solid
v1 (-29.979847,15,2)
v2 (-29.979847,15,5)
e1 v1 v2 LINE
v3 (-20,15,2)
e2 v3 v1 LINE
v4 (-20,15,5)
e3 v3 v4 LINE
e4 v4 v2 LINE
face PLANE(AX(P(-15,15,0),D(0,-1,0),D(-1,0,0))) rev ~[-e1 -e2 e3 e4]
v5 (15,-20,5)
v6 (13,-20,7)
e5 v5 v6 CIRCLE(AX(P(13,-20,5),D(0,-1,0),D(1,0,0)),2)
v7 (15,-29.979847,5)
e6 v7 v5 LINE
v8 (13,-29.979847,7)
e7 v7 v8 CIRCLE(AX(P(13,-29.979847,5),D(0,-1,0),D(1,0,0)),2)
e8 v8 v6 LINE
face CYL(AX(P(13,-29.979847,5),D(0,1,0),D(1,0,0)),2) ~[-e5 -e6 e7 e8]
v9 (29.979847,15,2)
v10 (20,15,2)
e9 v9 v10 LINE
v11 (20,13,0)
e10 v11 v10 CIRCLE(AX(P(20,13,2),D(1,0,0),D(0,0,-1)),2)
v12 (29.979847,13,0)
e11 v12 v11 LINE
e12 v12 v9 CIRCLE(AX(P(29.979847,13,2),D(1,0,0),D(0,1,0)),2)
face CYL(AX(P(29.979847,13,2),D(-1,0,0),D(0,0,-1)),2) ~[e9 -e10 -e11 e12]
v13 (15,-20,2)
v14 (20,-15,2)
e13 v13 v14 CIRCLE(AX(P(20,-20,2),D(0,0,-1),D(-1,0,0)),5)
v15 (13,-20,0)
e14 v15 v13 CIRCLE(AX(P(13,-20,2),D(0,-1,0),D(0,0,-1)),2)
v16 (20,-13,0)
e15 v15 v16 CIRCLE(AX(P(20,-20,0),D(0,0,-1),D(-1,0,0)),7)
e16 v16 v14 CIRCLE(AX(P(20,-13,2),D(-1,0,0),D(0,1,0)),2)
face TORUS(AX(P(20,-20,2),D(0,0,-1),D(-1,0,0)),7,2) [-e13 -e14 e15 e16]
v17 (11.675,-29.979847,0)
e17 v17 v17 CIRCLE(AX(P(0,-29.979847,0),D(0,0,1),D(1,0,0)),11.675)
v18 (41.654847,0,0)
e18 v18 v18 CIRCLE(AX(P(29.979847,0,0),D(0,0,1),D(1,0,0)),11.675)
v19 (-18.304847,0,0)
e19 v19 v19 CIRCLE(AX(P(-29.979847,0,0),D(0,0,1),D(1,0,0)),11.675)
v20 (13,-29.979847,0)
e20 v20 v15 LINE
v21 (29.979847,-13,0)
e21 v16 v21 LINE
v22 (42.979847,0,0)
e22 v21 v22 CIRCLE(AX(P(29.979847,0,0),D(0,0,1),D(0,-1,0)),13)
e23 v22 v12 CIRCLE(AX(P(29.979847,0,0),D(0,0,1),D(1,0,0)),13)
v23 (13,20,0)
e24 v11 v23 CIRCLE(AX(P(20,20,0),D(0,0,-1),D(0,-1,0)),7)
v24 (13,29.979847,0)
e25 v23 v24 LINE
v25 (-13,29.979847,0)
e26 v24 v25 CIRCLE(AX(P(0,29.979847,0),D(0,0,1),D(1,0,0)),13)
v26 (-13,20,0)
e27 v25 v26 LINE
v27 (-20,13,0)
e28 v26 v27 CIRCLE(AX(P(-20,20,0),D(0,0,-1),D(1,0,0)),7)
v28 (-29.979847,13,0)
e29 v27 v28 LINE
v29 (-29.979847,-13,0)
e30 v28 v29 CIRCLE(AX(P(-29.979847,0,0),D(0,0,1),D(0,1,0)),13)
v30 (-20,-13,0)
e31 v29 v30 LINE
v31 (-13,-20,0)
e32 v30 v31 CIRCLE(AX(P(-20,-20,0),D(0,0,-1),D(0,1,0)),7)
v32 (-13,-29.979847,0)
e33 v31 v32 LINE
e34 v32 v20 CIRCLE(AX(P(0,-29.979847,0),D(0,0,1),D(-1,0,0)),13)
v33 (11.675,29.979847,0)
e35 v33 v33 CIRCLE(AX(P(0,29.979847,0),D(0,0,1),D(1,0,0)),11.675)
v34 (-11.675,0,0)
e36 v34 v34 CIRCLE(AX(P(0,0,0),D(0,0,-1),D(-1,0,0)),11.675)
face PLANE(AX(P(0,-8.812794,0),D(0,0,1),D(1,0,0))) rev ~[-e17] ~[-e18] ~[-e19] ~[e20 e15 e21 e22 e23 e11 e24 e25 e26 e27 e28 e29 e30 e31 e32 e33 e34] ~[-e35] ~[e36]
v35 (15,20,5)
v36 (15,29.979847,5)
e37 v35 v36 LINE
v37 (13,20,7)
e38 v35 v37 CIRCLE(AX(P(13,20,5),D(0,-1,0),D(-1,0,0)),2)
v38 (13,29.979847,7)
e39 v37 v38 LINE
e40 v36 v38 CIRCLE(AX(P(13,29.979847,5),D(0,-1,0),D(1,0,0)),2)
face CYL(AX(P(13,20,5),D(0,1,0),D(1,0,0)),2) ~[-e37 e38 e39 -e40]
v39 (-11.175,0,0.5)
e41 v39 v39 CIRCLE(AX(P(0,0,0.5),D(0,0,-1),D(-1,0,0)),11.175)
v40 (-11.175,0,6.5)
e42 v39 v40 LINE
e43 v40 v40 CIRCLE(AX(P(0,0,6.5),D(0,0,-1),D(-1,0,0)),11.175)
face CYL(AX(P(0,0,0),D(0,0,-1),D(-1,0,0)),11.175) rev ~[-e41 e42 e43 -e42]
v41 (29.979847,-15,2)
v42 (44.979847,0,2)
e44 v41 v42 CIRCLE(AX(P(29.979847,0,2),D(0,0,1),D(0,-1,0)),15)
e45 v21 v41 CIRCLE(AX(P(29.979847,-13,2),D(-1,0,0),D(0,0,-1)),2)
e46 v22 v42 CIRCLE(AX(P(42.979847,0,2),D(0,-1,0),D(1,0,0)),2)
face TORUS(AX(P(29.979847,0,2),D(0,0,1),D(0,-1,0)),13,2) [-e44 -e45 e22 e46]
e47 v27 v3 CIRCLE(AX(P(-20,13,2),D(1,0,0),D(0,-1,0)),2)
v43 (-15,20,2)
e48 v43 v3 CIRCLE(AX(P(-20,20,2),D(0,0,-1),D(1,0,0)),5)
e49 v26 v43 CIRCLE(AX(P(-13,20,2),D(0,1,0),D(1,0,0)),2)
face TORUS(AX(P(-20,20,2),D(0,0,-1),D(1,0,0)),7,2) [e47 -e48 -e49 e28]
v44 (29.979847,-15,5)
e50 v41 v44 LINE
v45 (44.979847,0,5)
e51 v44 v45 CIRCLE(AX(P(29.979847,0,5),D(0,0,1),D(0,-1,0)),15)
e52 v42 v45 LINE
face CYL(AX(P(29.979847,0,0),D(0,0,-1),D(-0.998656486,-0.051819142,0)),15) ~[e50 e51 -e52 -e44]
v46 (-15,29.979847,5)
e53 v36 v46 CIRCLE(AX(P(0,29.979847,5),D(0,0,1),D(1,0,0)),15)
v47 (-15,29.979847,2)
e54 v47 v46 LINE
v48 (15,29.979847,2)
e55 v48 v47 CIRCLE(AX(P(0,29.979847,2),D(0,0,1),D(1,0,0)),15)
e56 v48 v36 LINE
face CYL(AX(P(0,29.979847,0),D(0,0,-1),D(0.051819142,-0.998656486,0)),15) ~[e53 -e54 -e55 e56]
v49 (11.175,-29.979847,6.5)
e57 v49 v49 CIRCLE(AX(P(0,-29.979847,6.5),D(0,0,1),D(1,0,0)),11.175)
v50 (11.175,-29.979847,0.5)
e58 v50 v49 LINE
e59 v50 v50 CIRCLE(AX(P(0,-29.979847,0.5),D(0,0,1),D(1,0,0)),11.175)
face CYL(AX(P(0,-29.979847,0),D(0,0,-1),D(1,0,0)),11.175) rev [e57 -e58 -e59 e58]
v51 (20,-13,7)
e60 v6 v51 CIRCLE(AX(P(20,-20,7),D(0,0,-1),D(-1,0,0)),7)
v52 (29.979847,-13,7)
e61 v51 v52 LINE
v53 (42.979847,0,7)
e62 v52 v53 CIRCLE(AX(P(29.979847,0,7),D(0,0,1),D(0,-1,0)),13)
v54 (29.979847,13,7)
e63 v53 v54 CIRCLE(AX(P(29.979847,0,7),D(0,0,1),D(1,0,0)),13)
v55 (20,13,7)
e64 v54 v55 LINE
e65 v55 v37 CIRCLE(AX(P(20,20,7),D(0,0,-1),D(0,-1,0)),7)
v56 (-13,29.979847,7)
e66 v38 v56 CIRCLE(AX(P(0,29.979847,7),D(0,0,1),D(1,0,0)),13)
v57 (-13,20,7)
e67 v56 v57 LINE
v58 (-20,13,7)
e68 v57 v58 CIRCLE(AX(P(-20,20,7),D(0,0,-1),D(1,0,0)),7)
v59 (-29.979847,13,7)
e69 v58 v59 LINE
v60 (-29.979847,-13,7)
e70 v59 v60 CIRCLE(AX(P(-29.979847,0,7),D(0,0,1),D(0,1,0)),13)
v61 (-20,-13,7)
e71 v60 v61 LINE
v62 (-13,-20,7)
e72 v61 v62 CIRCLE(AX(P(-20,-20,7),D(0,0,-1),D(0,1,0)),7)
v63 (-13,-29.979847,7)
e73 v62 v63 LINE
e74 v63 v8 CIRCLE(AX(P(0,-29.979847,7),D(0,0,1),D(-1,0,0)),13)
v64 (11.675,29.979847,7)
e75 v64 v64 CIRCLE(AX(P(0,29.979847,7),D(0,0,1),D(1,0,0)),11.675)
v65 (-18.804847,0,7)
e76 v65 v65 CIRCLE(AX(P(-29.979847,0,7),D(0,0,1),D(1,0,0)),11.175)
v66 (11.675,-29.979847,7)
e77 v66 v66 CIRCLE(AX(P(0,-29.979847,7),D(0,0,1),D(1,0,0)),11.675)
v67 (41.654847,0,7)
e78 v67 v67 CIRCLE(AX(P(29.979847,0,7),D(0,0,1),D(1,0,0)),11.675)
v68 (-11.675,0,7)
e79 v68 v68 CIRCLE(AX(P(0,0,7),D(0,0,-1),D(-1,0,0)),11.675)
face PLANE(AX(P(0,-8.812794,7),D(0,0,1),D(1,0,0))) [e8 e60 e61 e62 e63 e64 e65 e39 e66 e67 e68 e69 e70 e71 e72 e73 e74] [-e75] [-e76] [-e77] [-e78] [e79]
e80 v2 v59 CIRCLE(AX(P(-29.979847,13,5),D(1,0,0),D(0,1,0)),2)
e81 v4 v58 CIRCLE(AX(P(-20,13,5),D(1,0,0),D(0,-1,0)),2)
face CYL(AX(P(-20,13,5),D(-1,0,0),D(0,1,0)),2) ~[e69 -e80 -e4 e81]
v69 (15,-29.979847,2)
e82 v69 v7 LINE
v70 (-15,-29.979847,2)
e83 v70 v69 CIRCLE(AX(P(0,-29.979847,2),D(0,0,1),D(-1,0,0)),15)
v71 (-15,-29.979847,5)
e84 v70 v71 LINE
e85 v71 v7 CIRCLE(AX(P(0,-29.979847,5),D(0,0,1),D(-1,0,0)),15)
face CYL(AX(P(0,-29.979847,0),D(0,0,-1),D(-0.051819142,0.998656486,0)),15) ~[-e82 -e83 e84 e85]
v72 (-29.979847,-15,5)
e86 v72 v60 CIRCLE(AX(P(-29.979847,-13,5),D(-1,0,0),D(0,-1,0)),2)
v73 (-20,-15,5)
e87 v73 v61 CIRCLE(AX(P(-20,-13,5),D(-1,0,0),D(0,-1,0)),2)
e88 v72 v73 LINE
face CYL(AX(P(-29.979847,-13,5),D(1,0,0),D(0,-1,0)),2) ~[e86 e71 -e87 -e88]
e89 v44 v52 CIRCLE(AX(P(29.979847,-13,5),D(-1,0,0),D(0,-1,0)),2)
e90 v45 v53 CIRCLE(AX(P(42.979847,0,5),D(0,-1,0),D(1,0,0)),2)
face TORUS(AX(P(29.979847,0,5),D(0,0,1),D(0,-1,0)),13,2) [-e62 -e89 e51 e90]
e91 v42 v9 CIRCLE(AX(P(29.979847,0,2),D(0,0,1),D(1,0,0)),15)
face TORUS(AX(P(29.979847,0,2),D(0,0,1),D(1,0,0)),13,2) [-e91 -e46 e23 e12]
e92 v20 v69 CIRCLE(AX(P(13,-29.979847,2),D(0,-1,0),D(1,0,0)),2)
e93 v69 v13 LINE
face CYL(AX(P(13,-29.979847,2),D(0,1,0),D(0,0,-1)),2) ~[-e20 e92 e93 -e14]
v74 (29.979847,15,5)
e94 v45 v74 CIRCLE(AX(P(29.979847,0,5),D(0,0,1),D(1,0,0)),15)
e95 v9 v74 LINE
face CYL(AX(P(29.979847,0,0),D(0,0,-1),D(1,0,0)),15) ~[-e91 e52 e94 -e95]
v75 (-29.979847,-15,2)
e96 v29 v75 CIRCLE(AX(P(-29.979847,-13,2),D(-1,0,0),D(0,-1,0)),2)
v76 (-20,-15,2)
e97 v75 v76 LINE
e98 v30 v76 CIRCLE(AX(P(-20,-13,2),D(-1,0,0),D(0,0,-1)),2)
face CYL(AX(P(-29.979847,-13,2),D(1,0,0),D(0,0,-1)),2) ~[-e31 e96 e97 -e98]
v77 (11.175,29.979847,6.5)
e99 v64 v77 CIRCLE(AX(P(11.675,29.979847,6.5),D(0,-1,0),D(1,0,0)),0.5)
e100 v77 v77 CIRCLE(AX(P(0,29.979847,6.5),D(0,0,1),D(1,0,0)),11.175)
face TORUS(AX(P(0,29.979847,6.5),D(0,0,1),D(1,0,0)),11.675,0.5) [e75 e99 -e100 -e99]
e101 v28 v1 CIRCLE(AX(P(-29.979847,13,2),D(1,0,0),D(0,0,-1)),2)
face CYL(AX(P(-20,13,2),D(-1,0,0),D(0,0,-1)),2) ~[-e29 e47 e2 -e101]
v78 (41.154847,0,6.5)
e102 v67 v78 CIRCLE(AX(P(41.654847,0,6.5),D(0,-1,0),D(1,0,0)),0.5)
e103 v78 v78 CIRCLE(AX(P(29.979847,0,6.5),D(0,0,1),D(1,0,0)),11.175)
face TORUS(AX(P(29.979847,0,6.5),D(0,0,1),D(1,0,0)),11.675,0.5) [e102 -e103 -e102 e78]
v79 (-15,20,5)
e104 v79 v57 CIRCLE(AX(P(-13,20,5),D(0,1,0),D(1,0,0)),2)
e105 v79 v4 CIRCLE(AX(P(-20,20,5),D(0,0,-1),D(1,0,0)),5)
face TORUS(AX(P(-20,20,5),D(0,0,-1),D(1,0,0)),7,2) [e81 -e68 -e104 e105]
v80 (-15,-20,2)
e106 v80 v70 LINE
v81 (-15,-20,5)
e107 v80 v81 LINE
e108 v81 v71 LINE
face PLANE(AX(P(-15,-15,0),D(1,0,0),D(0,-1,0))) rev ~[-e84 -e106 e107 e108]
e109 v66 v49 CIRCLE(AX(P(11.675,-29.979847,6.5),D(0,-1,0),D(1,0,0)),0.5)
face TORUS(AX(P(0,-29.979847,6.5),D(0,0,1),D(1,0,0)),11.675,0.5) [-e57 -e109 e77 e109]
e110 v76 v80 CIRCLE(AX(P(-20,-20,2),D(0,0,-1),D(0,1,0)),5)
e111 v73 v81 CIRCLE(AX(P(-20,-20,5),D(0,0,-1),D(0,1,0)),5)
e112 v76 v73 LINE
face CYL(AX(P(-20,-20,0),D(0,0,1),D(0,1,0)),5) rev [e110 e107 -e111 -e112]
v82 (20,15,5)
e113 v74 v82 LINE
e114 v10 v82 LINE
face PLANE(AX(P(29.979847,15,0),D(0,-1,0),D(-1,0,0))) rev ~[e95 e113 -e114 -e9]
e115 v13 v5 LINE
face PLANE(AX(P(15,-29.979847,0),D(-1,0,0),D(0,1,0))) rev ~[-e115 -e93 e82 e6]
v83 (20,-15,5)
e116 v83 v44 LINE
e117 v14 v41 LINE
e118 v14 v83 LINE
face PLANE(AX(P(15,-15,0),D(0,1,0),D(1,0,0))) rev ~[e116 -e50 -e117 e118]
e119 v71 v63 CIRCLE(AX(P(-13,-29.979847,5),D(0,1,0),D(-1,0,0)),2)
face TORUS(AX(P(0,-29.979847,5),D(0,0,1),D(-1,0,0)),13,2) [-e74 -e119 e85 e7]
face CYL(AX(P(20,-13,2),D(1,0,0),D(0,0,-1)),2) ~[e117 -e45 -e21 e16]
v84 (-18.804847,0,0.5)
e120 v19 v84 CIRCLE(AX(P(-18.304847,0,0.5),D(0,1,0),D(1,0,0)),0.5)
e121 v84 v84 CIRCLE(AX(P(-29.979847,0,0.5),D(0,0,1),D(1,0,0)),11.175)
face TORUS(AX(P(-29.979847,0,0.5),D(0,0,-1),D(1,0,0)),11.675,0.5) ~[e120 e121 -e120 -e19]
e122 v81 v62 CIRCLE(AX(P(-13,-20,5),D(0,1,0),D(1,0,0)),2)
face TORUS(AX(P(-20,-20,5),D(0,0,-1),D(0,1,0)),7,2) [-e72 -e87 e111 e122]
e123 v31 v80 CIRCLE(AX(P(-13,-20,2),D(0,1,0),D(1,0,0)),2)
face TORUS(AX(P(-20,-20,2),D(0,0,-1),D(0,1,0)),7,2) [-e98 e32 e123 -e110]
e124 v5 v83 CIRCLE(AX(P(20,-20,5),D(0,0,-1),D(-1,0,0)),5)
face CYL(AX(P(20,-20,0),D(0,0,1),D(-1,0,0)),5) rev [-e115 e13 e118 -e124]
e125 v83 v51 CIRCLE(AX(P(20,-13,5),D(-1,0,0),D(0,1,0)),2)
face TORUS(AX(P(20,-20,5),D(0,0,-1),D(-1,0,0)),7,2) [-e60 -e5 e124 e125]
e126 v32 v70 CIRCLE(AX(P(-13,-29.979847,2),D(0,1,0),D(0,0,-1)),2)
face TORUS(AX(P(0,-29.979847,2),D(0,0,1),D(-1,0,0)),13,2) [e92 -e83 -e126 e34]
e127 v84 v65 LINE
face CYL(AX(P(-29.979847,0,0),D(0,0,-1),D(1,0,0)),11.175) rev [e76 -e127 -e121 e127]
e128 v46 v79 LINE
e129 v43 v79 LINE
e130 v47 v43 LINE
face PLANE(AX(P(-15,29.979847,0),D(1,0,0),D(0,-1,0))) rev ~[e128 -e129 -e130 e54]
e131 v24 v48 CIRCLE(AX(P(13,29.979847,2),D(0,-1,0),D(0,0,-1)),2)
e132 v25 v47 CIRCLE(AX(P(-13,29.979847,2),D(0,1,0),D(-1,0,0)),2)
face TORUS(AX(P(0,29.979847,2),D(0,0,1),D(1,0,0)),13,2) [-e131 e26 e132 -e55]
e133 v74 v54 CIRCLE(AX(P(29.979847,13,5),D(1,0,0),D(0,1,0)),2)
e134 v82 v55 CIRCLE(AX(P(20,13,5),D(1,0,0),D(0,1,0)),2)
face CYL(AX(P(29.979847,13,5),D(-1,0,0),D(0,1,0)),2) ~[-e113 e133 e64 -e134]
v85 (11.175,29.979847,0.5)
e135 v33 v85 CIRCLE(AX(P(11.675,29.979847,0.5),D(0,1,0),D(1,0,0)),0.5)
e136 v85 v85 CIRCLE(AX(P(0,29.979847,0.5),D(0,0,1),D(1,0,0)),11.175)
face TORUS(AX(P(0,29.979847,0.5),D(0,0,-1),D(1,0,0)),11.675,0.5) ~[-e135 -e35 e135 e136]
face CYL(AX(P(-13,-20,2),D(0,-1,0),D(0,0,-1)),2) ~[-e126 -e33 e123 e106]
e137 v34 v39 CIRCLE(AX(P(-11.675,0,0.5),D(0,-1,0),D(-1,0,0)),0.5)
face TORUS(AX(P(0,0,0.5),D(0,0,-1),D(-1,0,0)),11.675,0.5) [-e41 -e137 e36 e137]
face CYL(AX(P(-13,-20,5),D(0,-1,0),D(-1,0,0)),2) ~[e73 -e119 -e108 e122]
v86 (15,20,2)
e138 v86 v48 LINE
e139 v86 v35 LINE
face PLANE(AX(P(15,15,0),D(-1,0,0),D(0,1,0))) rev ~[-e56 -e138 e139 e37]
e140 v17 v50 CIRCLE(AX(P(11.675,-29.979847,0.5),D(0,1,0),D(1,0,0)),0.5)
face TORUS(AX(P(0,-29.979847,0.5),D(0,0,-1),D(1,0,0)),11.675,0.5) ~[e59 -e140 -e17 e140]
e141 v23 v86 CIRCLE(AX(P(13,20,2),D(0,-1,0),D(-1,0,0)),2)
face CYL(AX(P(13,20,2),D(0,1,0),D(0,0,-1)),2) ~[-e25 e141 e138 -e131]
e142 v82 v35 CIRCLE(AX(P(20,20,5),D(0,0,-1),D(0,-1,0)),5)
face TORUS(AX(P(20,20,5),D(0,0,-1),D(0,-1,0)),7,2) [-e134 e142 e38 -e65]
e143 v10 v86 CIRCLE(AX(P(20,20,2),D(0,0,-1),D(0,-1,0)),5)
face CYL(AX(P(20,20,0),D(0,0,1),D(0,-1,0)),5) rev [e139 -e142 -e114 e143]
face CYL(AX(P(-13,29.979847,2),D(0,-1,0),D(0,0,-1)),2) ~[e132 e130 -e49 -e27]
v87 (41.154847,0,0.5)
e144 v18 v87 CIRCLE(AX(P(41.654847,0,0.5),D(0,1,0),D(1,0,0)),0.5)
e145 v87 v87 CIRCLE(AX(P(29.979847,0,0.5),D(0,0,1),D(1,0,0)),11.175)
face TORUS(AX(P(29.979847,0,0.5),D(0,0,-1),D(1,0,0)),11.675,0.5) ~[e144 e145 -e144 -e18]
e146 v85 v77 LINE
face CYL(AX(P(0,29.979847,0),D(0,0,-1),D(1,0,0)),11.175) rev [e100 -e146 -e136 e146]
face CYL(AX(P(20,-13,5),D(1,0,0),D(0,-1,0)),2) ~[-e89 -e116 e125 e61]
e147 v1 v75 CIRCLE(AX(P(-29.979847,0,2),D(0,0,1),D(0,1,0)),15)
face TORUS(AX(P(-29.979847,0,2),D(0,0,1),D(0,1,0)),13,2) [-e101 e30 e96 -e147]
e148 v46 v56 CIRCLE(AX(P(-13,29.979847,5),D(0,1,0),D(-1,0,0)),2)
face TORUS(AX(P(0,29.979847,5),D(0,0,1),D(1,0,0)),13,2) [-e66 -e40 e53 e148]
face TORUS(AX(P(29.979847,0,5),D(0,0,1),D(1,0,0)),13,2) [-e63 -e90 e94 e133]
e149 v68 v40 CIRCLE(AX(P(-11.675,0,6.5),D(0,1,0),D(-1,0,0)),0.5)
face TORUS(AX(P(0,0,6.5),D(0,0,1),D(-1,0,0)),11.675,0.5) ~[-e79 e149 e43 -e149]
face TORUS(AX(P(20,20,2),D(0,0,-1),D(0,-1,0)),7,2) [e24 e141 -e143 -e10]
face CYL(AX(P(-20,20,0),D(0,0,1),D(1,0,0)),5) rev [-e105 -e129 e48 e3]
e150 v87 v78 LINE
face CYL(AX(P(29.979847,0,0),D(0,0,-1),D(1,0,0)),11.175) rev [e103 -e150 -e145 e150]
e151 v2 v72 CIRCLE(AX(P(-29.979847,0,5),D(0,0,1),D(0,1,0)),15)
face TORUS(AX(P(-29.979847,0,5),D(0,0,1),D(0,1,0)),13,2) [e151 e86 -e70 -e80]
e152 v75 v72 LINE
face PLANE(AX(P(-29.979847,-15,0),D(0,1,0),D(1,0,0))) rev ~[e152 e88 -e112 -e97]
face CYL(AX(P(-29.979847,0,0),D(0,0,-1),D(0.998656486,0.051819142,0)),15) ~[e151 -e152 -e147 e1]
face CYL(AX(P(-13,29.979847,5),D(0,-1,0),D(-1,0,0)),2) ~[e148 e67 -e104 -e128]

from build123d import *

# Parameters (mm, degrees)
F0_R     = 11.175
F1_DEPTH = 7
F2_R     = 5
F3_R     = 0.5
F4_R     = 2


# Not quite as in the source:
# - a feature names something its author has since deleted; it is built from what else it names


with BuildPart() as f1:
    # F0 (on Top) → F1 (new body)
    with BuildSketch(Plane.XY):
        with BuildLine():
            ThreePointArc((15, -0.7772871268), (14.9848863112, -0.3887741663), (14.9798472864, 0))
            Line((14.9798472864, 0), (11.175, 0))
            ThreePointArc((11.175, 0), (0, -11.175), (-11.175, 0))
            Line((-11.175, 0), (-14.9798472864, 0))
            ThreePointArc((-14.9798472864, 0), (-14.9848863112, -0.3887741663), (-15, -0.7772871268))
            Line((-15, -0.7772871268), (-15, -15))
            Line((-15, -15), (-0.7772871268, -15))
            ThreePointArc((-0.7772871268, -15), (0, -14.9798472864), (0.7772871268, -15))
            Line((0.7772871268, -15), (15, -15))
            Line((15, -15), (15, -0.7772871268))
        make_face()
        with BuildLine():
            ThreePointArc((-0.7772871268, 15), (-10.8779434385, 19.6517135465), (-15, 29.9798472864))
            Line((-15, 29.9798472864), (-15, 15))
            Line((-15, 15), (-0.7772871268, 15))
        make_face()
        with BuildLine():
            ThreePointArc((0.7772871268, 15), (10.8779434385, 19.6517135465), (15, 29.9798472864))
            ThreePointArc((15, 29.9798472864), (0, 44.9798472864), (-15, 29.9798472864))
            ThreePointArc((-15, 29.9798472864), (-10.8779434385, 19.6517135465), (-0.7772871268, 15))
            Line((-0.7772871268, 15), (0, 15))
            Line((0, 15), (0.7772871268, 15))
        make_face()
        with Locations((0, 29.9798472864)):
            Circle(F0_R, mode=Mode.SUBTRACT)
        with BuildLine():
            Line((-15, 0), (-15, 0.7772871268))
            ThreePointArc((-15, 0.7772871268), (-19.6517135465, 10.8779434385), (-29.9798472864, 15))
            ThreePointArc((-29.9798472864, 15), (-44.9798472864, 0), (-29.9798472864, -15))
            ThreePointArc((-29.9798472864, -15), (-19.6517135465, -10.8779434385), (-15, -0.7772871268))
            Line((-15, -0.7772871268), (-15, 0))
        make_face()
        with Locations((-29.9798472864, 0)):
            Circle(F0_R, mode=Mode.SUBTRACT)
        with BuildLine():
            Line((15, 15), (0.7772871268, 15))
            ThreePointArc((0.7772871268, 15), (0, 14.9798472864), (-0.7772871268, 15))
            Line((-0.7772871268, 15), (-15, 15))
            Line((-15, 15), (-15, 0.7772871268))
            ThreePointArc((-15, 0.7772871268), (-14.9848863112, 0.3887741663), (-14.9798472864, 0))
            Line((-14.9798472864, 0), (-11.175, 0))
            ThreePointArc((-11.175, 0), (0, 11.175), (11.175, 0))
            Line((11.175, 0), (14.9798472864, 0))
            ThreePointArc((14.9798472864, 0), (14.9848863112, 0.3887741663), (15, 0.7772871268))
            Line((15, 0.7772871268), (15, 15))
        make_face()
        with BuildLine():
            ThreePointArc((-0.7772871268, 15), (0, 14.9798472864), (0.7772871268, 15))
            Line((0.7772871268, 15), (0, 15))
            Line((0, 15), (-0.7772871268, 15))
        make_face()
        with BuildLine():
            ThreePointArc((-14.9798472864, 0), (-14.9848863112, 0.3887741663), (-15, 0.7772871268))
            Line((-15, 0.7772871268), (-15, 0))
            Line((-15, 0), (-14.9798472864, 0))
        make_face()
        with BuildLine():
            Line((-14.9798472864, 0), (-15, 0))
            Line((-15, 0), (-15, -0.7772871268))
            ThreePointArc((-15, -0.7772871268), (-14.9848863112, -0.3887741663), (-14.9798472864, 0))
        make_face()
        with BuildLine():
            ThreePointArc((29.9798472864, 15), (19.6517135465, 10.8779434385), (15, 0.7772871268))
            Line((15, 0.7772871268), (15, 0))
            Line((15, 0), (15, -0.7772871268))
            ThreePointArc((15, -0.7772871268), (19.6517135465, -10.8779434385), (29.9798472864, -15))
            ThreePointArc((29.9798472864, -15), (40.5864490042, -10.6066017178), (44.9798472864, 0))
            ThreePointArc((44.9798472864, 0), (40.5864490042, 10.6066017178), (29.9798472864, 15))
        make_face()
        with Locations((29.9798472864, 0)):
            Circle(F0_R, mode=Mode.SUBTRACT)
        with BuildLine():
            ThreePointArc((29.9798472864, -15), (19.6517135465, -10.8779434385), (15, -0.7772871268))
            Line((15, -0.7772871268), (15, -15))
            Line((15, -15), (29.9798472864, -15))
        make_face()
        with BuildLine():
            Line((15, -0.7772871268), (15, 0))
            Line((15, 0), (14.9798472864, 0))
            ThreePointArc((14.9798472864, 0), (14.9848863112, -0.3887741663), (15, -0.7772871268))
        make_face()
        with BuildLine():
            Line((15, 0), (15, 0.7772871268))
            ThreePointArc((15, 0.7772871268), (14.9848863112, 0.3887741663), (14.9798472864, 0))
            Line((14.9798472864, 0), (15, 0))
        make_face()
        with BuildLine():
            Line((29.9798472864, 15), (15, 15))
            Line((15, 15), (15, 0.7772871268))
            ThreePointArc((15, 0.7772871268), (19.6517135465, 10.8779434385), (29.9798472864, 15))
        make_face()
        with BuildLine():
            Line((15, 15), (15, 29.9798472864))
            ThreePointArc((15, 29.9798472864), (10.8779434385, 19.6517135465), (0.7772871268, 15))
            Line((0.7772871268, 15), (15, 15))
        make_face()
        with BuildLine():
            Line((0, -15), (-0.7772871268, -15))
            ThreePointArc((-0.7772871268, -15), (-10.8779434385, -19.6517135465), (-15, -29.9798472864))
            ThreePointArc((-15, -29.9798472864), (0, -44.9798472864), (15, -29.9798472864))
            ThreePointArc((15, -29.9798472864), (10.8779434385, -19.6517135465), (0.7772871268, -15))
            Line((0.7772871268, -15), (0, -15))
        make_face()
        with Locations((0, -29.9798472864)):
            Circle(F0_R, mode=Mode.SUBTRACT)
        with BuildLine():
            Line((15, -29.9798472864), (15, -15))
            Line((15, -15), (0.7772871268, -15))
            ThreePointArc((0.7772871268, -15), (10.8779434385, -19.6517135465), (15, -29.9798472864))
        make_face()
        with BuildLine():
            ThreePointArc((0.7772871268, -15), (0, -14.9798472864), (-0.7772871268, -15))
            Line((-0.7772871268, -15), (0, -15))
            Line((0, -15), (0.7772871268, -15))
        make_face()
        with BuildLine():
            Line((-0.7772871268, -15), (-15, -15))
            Line((-15, -15), (-15, -29.9798472864))
            ThreePointArc((-15, -29.9798472864), (-10.8779434385, -19.6517135465), (-0.7772871268, -15))
        make_face()
        with BuildLine():
            ThreePointArc((-15, -0.7772871268), (-19.6517135465, -10.8779434385), (-29.9798472864, -15))
            Line((-29.9798472864, -15), (-15, -15))
            Line((-15, -15), (-15, -0.7772871268))
        make_face()
        with BuildLine():
            Line((-15, 0.7772871268), (-15, 15))
            Line((-15, 15), (-29.9798472864, 15))
            ThreePointArc((-29.9798472864, 15), (-19.6517135465, 10.8779434385), (-15, 0.7772871268))
        make_face()
    extrude(amount=F1_DEPTH)

    # F2
    f2_edges = [f1.edges().sort_by_distance(p)[0] for p in [
        (15, -15, 3.5),
        (-15, -15, 3.5),
        (15, 15, 3.5),
        (-15, 15, 3.5),
    ]]
    fillet(f2_edges, radius=F2_R)

    # F3
    f3_edges = [f1.edges().sort_by_distance(p)[0] for p in [
        (-11.175, 29.979847, 7),
        (11.175, 0, 7),
        (-11.175, 29.979847, 0),
        (11.175, 0, 0),
        (-11.175, -29.979847, 7),
        (-41.154847, 0, 0),
        (18.804847, 0, 0),
        (-11.175, -29.979847, 0),
        (18.804847, 0, 7),
    ]]
    fillet(f3_edges, radius=F3_R)

    # F4
    f4_edges = [f1.edges().sort_by_distance(p)[0] for p in [
        (-16.464466, 16.464466, 0),
        (-15, 20, 3.5),
        (-20, 15, 3.5),
        (-16.464466, 16.464466, 7),
        (-15, 24.989924, 0),
        (-15, 29.979847, 3.5),
        (-15, 24.989924, 7),
        (15, 29.979847, 3.5),
        (0, 44.979847, 0),
        (0, 44.979847, 7),
        (15, 24.989924, 0),
        (15, 20, 3.5),
        (15, 24.989924, 7),
        (16.464466, 16.464466, 0),
        (20, 15, 3.5),
        (16.464466, 16.464466, 7),
        (0, -44.979847, 7),
        (0, -44.979847, 0),
        (15, -24.989924, 0),
        (16.464466, -16.464466, 0),
        (24.989924, -15, 0),
        (-15, -24.989924, 0),
        (44.979847, 0, 0),
        (-16.464466, -16.464466, 0),
        (24.989924, 15, 0),
        (-24.989924, -15, 0),
        (-44.979847, 0, 0),
        (-24.989924, 15, 0),
        (15, -24.989924, 7),
        (16.464466, -16.464466, 7),
        (24.989924, -15, 7),
        (-15, -24.989924, 7),
        (44.979847, 0, 7),
        (-16.464466, -16.464466, 7),
        (24.989924, 15, 7),
        (-24.989924, -15, 7),
        (-44.979847, 0, 7),
        (-24.989924, 15, 7),
    ]]
    fillet(f4_edges, radius=F4_R)


solid = f1.part
